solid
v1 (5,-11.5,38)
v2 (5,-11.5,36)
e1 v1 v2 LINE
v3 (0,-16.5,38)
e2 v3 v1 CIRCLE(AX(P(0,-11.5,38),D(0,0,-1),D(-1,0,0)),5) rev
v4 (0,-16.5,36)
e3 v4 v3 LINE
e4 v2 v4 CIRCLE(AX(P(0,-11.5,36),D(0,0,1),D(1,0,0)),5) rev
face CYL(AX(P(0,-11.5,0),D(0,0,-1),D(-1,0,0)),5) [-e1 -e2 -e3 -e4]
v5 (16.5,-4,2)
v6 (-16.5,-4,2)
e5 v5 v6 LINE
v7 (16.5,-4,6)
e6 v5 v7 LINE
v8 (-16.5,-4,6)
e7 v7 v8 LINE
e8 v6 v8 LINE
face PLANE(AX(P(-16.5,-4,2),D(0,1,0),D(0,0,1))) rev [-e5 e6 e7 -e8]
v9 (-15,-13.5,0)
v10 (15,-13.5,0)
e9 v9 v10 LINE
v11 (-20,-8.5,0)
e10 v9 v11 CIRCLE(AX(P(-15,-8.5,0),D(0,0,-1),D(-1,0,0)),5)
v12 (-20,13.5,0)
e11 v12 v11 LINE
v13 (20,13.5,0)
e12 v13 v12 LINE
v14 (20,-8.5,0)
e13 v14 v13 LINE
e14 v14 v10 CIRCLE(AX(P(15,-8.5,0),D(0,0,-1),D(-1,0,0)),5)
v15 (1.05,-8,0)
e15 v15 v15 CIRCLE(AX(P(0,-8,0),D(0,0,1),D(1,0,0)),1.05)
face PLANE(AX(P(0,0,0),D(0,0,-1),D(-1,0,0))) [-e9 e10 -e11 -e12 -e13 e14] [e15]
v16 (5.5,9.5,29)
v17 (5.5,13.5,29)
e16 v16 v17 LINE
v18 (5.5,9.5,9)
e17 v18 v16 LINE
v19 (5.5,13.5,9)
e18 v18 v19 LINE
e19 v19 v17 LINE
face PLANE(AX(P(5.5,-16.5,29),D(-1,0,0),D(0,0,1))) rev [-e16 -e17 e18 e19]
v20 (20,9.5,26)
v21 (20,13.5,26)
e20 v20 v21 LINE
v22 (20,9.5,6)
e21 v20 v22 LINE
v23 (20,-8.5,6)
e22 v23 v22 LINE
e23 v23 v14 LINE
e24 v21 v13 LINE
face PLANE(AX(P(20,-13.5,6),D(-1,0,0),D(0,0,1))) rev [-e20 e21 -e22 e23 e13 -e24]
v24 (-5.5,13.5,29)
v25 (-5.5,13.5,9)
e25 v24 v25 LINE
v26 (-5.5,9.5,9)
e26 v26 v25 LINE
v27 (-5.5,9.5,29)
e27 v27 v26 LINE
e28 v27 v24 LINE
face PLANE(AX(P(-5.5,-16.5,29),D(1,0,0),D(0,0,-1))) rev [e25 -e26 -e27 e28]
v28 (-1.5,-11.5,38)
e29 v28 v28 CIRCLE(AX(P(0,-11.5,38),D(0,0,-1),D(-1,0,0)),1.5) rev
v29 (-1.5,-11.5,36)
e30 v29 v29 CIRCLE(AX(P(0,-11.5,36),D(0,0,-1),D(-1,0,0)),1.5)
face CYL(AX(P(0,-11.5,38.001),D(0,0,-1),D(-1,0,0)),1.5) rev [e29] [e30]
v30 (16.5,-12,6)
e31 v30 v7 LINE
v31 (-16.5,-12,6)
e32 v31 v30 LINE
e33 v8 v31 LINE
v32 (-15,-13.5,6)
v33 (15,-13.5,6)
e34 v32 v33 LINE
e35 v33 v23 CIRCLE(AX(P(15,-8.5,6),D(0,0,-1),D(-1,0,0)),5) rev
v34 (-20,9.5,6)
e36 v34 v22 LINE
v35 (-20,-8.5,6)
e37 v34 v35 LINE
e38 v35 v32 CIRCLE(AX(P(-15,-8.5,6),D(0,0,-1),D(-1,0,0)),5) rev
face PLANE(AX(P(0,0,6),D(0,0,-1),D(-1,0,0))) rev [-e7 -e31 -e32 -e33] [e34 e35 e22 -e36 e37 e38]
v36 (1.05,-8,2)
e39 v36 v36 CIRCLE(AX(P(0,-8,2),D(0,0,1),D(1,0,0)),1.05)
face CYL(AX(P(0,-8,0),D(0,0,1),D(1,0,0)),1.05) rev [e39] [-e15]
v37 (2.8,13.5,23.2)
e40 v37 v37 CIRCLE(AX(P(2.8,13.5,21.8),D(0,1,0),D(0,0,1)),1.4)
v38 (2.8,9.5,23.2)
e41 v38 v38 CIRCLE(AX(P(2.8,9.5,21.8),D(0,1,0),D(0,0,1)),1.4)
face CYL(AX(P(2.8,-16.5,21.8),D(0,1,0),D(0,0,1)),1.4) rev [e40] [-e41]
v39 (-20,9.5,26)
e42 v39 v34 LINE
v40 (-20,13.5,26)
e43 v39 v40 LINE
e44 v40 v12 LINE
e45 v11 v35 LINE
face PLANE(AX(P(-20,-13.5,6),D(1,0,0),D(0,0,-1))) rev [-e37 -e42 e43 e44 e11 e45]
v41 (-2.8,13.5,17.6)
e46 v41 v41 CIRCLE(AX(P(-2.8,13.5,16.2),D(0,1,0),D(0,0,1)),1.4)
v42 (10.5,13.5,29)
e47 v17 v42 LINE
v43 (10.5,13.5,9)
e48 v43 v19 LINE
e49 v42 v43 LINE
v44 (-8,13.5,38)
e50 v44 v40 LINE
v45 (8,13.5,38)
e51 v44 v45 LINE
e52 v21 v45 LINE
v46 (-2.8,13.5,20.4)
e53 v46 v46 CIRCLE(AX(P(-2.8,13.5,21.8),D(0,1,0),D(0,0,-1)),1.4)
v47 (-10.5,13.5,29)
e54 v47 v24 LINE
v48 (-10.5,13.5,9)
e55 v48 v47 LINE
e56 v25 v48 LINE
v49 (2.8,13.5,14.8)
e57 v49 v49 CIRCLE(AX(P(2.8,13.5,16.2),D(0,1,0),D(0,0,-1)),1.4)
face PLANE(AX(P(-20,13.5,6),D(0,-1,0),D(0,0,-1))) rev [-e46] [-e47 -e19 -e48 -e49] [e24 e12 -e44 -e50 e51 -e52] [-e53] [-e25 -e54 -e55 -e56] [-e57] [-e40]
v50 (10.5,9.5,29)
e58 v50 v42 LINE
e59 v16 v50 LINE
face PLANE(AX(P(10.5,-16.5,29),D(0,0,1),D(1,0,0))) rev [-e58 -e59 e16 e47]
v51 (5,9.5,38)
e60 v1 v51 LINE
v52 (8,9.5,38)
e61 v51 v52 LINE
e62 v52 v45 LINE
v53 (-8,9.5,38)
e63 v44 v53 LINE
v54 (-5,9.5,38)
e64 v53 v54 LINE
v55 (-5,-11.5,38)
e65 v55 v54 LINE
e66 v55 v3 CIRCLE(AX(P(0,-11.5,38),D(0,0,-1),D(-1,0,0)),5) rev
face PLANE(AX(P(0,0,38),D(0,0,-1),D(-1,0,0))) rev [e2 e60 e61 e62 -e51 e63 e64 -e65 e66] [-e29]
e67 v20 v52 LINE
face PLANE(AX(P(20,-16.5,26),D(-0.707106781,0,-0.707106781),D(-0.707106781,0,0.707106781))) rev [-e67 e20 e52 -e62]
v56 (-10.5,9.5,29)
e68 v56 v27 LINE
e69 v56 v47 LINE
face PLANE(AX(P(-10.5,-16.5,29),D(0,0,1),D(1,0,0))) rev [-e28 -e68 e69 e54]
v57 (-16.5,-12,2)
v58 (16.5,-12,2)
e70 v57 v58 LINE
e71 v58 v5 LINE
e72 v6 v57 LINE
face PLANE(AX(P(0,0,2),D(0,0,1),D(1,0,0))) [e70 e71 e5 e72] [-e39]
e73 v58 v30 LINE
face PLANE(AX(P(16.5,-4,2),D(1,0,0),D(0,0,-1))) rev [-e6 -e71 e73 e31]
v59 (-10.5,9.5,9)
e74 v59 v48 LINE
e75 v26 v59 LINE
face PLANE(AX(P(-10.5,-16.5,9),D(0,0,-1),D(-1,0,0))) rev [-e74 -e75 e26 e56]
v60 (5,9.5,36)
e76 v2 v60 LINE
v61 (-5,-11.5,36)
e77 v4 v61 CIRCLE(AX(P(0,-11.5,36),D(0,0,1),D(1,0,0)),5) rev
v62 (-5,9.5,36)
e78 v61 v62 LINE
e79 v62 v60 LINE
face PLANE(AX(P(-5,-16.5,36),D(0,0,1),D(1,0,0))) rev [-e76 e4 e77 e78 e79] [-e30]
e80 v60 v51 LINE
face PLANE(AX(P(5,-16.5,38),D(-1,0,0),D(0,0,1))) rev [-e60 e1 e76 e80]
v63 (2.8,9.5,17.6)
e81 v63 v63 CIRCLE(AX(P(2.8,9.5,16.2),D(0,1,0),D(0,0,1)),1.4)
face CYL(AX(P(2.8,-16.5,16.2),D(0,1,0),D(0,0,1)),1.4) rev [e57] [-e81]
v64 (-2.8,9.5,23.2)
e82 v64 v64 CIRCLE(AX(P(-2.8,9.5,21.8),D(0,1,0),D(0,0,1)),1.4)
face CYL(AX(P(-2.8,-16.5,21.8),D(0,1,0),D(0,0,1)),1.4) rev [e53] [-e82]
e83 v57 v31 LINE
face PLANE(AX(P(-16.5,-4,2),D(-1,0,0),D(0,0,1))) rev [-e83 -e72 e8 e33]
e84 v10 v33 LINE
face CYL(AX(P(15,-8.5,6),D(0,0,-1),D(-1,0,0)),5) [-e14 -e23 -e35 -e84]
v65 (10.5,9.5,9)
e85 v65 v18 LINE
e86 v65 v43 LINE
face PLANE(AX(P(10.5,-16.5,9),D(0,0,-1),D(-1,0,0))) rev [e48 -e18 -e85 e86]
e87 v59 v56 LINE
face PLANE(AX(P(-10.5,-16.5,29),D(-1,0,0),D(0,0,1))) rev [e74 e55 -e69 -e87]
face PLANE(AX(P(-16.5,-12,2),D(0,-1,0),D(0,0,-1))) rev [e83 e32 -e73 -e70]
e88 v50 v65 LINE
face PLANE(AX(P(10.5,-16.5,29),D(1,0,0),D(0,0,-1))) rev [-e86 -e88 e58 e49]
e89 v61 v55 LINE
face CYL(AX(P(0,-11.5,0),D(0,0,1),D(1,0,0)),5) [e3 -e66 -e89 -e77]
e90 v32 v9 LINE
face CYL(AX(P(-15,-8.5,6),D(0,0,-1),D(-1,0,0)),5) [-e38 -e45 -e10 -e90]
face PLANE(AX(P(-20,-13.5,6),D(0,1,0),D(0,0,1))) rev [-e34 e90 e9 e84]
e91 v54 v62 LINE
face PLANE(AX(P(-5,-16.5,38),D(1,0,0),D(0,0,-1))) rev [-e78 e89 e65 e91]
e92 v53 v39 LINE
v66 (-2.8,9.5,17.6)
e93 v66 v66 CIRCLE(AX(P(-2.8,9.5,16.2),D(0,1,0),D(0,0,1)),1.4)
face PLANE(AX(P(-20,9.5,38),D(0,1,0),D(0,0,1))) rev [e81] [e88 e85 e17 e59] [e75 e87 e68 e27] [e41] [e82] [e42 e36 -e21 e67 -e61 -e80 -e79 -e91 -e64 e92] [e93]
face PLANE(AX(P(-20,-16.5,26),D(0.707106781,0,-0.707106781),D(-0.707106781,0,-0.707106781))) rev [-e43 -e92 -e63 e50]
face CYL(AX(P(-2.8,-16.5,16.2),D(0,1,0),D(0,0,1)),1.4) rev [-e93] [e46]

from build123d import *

# Parameters (mm, degrees)
SCHIZZO3_W                   = 40
SCHIZZO3_H                   = 27
ESTRUSIONE_ESTRUSIONE1_DEPTH = 6
SCHIZZO4_W                   = 33
SCHIZZO4_H                   = 8
TAGLIO_ESTRUSIONE1_DEPTH     = 4
SCHIZZO5_R                   = 1.05
TAGLIO_ESTRUSIONE2_DEPTH     = 25.459149617
SCHIZZO6_W                   = 40
SCHIZZO6_H                   = 4
ESTRUSIONE_ESTRUSIONE2_DEPTH = 32
SCHIZZO7_W                   = 10
SCHIZZO7_H                   = 2
ESTRUSIONE_ESTRUSIONE3_DEPTH = 26
SCHIZZO8_R                   = 1.4
SCHIZZO8_W                   = 5
SCHIZZO8_H                   = 20
TAGLIO_ESTRUSIONE3_DEPTH     = 53.383203415
RACCORDO1_R                  = 5
TAGLIO_ESTRUSIONE4_REACH     = 46.365
SCHIZZO9_R                   = 1.5


with BuildPart() as part:
    # Schizzo3 → Estrusione-Estrusione1 (new body)
    with BuildSketch(Plane.XY):
        Rectangle(SCHIZZO3_W, SCHIZZO3_H)
    extrude(amount=ESTRUSIONE_ESTRUSIONE1_DEPTH)

    # Schizzo4 → Taglio-Estrusione1 (cut)
    with BuildSketch(Plane.XY.offset(6)):
        with Locations((0, -8)):
            Rectangle(SCHIZZO4_W, SCHIZZO4_H)
    extrude(amount=-TAGLIO_ESTRUSIONE1_DEPTH, mode=Mode.SUBTRACT)

    # Schizzo5 → Taglio-Estrusione2 (cut, through all)
    with BuildSketch(Plane.XY.offset(2)):
        with Locations((0, -8)):
            Circle(SCHIZZO5_R)
    extrude(amount=-TAGLIO_ESTRUSIONE2_DEPTH, mode=Mode.SUBTRACT)

    # Schizzo6 → Estrusione-Estrusione2 (add)
    with BuildSketch(Plane.XY.offset(6)):
        with Locations((0, 11.5)):
            Rectangle(SCHIZZO6_W, SCHIZZO6_H)
    extrude(amount=ESTRUSIONE_ESTRUSIONE2_DEPTH)

    # Schizzo7 → Estrusione-Estrusione3 (add)
    with BuildSketch(Plane.XZ.offset(-9.5)):
        with Locations((0, 37)):
            Rectangle(SCHIZZO7_W, SCHIZZO7_H)
    extrude(amount=ESTRUSIONE_ESTRUSIONE3_DEPTH)

    # Schizzo8 → Taglio-Estrusione3 (cut, through all)
    with BuildSketch(Plane(origin=(0, 13.5, 0), x_dir=(1, 0, 0), z_dir=(0, 1, 0))):
        with Locations(Location((-2.8, -16.2, 0), (0, 0, 270))):
            Circle(SCHIZZO8_R)
        with Locations(Location((-2.8, -21.8, 0), (0, 0, 270))):
            Circle(SCHIZZO8_R)
        with Locations(Location((2.8, -21.8, 0), (0, 0, 270))):
            Circle(SCHIZZO8_R)
        with Locations(Location((2.8, -16.2, 0), (0, 0, 270))):
            Circle(SCHIZZO8_R)
        with Locations((8, -19)):
            Rectangle(SCHIZZO8_W, SCHIZZO8_H)
        with Locations((-8, -19)):
            Rectangle(SCHIZZO8_W, SCHIZZO8_H)
        Polygon((-20, -26), (-8, -38), (-20, -38), align=None)
        Polygon((8, -38), (20, -38), (20, -26), align=None)
    extrude(amount=-TAGLIO_ESTRUSIONE3_DEPTH, mode=Mode.SUBTRACT)

    # Raccordo1
    raccordo1_edges = [part.edges().sort_by_distance(p)[0] for p in [
        (-5, -16.5, 37),
        (5, -16.5, 37),
        (20, -13.5, 3),
        (-20, -13.5, 3),
    ]]
    fillet(raccordo1_edges, radius=RACCORDO1_R - 0.0001)  # a hair under: the kernel refuses the full size

    # Schizzo9 → Taglio-Estrusione4 (cut, up to next)
    with BuildSketch(Plane(origin=(0, 0, 36), x_dir=(-1, 0, 0), z_dir=(0, 0, -1)), mode=Mode.PRIVATE) as taglio_estrusione4_sk1:
        with Locations((0, -11.5)):
            Circle(SCHIZZO9_R)
    taglio_estrusione4_tool1 = extrude(taglio_estrusione4_sk1.sketch, amount=-TAGLIO_ESTRUSIONE4_REACH, mode=Mode.PRIVATE) & part.part
    add(taglio_estrusione4_tool1.solids().sort_by_distance((0, -11.5, 36))[0], mode=Mode.SUBTRACT)


solid = part.part
